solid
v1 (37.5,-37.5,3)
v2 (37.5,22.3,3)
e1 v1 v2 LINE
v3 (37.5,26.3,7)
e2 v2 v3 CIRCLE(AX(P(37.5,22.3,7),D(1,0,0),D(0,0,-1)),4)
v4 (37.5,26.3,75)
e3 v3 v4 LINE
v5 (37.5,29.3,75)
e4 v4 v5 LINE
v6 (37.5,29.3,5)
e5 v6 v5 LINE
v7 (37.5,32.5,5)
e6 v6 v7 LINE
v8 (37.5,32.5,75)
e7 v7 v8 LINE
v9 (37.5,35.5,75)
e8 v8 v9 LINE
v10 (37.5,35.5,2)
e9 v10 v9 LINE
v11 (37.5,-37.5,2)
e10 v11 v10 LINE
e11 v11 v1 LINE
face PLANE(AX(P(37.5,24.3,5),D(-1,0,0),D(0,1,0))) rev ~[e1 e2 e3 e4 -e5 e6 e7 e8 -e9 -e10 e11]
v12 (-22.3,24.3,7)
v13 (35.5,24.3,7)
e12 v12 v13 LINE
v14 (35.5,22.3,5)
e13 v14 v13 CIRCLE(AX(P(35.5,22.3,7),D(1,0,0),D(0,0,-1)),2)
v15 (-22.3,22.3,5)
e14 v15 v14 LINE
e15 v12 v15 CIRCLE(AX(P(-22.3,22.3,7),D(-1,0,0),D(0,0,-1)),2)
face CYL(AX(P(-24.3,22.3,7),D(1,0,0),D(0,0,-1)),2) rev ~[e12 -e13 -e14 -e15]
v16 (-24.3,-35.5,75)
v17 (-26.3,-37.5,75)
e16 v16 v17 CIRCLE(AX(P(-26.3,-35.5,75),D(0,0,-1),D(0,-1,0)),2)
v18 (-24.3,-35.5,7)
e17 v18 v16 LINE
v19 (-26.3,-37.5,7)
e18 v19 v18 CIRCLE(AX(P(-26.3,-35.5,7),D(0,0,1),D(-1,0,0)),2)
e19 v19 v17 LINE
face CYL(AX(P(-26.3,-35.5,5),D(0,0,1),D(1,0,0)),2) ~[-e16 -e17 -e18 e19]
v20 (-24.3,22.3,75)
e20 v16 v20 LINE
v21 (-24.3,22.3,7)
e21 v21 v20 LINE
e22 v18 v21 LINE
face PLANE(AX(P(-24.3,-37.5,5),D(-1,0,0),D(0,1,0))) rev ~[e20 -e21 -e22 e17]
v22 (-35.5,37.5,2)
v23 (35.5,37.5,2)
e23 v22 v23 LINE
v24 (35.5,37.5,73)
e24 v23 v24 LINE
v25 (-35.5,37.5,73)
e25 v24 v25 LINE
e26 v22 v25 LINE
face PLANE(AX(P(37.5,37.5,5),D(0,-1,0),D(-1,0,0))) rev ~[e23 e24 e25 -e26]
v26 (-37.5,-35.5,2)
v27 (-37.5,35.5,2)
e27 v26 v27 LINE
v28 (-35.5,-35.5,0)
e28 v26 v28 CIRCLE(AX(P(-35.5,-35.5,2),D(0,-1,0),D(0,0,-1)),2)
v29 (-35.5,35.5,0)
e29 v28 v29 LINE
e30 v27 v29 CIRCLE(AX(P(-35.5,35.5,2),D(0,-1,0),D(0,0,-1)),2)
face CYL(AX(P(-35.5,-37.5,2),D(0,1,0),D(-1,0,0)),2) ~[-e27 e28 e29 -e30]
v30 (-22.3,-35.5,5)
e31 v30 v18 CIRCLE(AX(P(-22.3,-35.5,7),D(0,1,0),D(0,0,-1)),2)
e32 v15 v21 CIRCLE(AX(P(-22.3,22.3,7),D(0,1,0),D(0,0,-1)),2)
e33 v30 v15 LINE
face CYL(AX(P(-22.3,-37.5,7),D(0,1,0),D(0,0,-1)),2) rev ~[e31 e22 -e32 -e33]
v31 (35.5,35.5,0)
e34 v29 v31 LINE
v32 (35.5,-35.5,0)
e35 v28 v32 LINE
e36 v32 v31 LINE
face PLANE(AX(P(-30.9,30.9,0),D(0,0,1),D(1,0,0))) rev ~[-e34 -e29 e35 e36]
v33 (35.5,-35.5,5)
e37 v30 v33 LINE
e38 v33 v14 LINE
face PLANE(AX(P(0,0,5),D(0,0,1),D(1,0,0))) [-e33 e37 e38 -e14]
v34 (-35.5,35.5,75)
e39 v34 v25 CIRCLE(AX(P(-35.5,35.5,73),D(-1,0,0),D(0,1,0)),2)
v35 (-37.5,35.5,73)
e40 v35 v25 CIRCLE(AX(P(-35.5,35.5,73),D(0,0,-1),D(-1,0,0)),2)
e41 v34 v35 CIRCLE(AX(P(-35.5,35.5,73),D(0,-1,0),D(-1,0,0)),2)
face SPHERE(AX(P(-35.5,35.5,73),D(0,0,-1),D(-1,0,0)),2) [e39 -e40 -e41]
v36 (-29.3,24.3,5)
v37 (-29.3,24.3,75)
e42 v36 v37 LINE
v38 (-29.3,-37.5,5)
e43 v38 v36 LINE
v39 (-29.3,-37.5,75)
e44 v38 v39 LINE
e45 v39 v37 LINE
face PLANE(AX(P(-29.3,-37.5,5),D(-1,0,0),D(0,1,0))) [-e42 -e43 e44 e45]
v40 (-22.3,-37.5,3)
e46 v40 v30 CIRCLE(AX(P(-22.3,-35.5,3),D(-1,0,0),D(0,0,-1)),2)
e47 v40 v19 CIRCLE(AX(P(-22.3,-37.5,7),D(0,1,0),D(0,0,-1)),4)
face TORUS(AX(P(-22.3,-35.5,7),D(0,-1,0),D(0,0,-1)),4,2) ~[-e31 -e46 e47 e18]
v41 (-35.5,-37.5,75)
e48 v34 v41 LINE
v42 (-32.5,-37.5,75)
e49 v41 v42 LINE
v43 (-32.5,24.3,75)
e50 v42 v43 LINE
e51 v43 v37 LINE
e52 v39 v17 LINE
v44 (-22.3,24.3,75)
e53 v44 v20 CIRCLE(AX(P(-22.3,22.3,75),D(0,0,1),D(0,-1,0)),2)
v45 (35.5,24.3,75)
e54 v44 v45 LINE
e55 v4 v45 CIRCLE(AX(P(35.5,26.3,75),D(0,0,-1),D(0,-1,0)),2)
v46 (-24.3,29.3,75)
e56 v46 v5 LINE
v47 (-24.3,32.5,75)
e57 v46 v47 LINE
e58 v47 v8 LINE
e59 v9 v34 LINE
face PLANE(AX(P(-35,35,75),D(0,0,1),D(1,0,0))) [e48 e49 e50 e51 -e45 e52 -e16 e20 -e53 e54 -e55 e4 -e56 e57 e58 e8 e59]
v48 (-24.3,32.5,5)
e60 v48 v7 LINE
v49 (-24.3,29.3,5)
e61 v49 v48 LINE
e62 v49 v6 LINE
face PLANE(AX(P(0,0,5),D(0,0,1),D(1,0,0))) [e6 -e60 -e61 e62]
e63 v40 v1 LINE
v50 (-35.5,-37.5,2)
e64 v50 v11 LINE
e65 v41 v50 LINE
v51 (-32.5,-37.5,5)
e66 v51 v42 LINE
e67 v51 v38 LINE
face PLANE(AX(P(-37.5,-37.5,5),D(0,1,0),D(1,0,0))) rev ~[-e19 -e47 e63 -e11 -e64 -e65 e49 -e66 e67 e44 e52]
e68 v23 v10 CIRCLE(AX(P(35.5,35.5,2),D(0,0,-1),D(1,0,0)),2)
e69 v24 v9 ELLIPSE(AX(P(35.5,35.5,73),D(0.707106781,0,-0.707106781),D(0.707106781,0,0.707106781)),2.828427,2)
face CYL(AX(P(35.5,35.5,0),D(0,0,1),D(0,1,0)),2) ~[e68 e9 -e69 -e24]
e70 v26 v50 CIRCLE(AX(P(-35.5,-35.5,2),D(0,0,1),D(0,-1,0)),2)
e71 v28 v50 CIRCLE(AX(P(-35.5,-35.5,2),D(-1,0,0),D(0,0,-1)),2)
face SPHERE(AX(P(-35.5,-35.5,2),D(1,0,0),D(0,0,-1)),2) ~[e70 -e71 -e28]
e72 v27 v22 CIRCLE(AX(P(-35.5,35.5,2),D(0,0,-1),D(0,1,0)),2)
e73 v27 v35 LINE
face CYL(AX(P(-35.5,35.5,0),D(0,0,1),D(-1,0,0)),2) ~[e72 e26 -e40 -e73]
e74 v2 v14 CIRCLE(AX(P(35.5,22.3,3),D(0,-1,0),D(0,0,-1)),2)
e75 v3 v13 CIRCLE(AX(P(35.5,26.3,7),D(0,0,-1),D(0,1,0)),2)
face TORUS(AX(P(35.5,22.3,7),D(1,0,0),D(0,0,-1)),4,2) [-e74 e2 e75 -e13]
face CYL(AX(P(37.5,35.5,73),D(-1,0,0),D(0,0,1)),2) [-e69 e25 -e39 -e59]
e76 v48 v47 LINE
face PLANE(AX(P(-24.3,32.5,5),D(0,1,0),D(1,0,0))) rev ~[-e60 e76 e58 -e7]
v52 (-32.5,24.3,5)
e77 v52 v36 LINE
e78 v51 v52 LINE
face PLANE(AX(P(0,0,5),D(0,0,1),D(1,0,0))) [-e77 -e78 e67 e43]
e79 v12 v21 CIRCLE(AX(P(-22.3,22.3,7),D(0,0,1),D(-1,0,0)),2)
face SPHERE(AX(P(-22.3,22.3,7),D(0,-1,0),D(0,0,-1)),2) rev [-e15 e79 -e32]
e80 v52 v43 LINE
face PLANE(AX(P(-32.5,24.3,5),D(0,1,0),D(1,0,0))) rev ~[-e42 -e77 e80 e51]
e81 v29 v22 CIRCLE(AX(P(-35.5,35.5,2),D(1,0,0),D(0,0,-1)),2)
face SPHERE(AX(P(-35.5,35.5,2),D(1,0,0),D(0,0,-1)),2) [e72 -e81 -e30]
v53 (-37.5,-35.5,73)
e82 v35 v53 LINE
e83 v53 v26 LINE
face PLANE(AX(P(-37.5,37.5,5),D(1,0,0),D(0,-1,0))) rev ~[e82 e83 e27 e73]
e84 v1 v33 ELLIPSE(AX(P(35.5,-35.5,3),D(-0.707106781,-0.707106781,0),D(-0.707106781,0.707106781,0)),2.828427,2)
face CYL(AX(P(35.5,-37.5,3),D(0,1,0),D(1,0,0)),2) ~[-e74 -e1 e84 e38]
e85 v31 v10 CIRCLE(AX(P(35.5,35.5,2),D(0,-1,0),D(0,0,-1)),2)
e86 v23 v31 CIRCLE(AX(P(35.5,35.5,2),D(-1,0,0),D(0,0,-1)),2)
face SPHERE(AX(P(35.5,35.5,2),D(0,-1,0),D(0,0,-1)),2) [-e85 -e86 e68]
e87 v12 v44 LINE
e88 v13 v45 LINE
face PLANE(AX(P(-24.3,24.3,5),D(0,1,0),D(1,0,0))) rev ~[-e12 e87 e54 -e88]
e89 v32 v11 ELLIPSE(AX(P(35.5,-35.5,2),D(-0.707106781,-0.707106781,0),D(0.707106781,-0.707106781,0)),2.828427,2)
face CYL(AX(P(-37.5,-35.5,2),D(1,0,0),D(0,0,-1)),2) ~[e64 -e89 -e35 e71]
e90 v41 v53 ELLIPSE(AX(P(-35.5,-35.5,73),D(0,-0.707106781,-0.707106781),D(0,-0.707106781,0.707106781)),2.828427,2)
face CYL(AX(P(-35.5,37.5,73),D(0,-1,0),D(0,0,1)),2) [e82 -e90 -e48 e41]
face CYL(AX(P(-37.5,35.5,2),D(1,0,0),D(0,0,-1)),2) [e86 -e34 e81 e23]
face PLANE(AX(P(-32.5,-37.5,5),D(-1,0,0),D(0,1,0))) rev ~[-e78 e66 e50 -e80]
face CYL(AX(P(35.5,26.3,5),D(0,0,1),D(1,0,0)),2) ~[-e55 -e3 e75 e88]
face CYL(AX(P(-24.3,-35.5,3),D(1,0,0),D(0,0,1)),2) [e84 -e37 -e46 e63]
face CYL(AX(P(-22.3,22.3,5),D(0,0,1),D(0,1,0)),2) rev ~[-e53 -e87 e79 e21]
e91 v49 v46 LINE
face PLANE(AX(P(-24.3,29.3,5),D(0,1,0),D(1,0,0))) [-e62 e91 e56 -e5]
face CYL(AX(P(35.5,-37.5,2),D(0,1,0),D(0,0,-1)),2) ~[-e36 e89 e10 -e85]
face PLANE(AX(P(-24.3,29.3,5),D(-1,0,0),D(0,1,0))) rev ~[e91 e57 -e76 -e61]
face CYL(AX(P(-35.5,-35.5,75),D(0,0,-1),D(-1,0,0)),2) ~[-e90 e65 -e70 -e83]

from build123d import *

# Parameters (mm, degrees)
F0_W     = 75
F0_H     = 75
F1_DEPTH = 5
F2_W     = 5
F2_H     = 5
F2_W_2   = 3.2
F2_H_2   = 3.2
F2_W_3   = 61.8
F2_H_3   = 61.8
F3_DEPTH = 70
F4_R     = 2
F5_W     = 3.2
F5_H     = 3.2
F6_DEPTH = 75


# Not quite as in the source:
# - a feature names something its author has since deleted; it is built from what else it names


with BuildPart() as f1:
    # F0 (on Top) → F1 (new body)
    with BuildSketch(Plane.XY):
        Rectangle(F0_W, F0_H)
    extrude(amount=F1_DEPTH)

    # F2 (on face) → F3 (join)
    with BuildSketch(Plane.XY.offset(5)):
        with Locations((-35, 35)):
            Rectangle(F2_W, F2_H)
        with Locations((-30.9, 35)):
            Rectangle(F2_W_2, F2_H)
        with Locations((-35, 30.9)):
            Rectangle(F2_W, F2_H_2)
        with Locations((-26.8, 35)):
            Rectangle(F2_W, F2_H)
        with Locations((-35, 26.8)):
            Rectangle(F2_W, F2_H)
        with Locations((-30.9, 26.8)):
            Rectangle(F2_W_2, F2_H)
        with Locations((-26.8, 30.9)):
            Rectangle(F2_W, F2_H_2)
        with Locations((6.6, 35)):
            Rectangle(F2_W_3, F2_H)
        with Locations((-35, -6.6)):
            Rectangle(F2_W, F2_H_3)
        with Locations((-26.8, 26.8)):
            Rectangle(F2_W, F2_H)
        with Locations((-26.8, -6.6)):
            Rectangle(F2_W, F2_H_3)
        with Locations((6.6, 26.8)):
            Rectangle(F2_W_3, F2_H)
    extrude(amount=F3_DEPTH)

    # F4
    f4_edges = [f1.edges().sort_by_distance(p)[0] for p in [
        (0, -37.5, 0),
        (37.5, 0, 0),
        (0, 37.5, 0),
        (-37.5, 0, 0),
        (-37.5, 37.5, 37.5),
        (-37.5, 0, 75),
        (-37.5, -37.5, 37.5),
        (37.5, 37.5, 37.5),
        (0, 37.5, 75),
        (-24.3, -6.6, 5),
        (6.6, 24.3, 5),
        (37.5, -6.6, 5),
        (6.6, -37.5, 5),
        (-24.3, 24.3, 40),
        (-24.3, -37.5, 40),
        (37.5, 24.3, 40),
    ]]
    fillet(f4_edges, radius=F4_R)

    # F5 (on face) → F6 (join, through all)
    with BuildSketch(Plane.XY.offset(75)):
        with Locations((-30.9, 30.9)):
            Rectangle(F5_W, F5_H)
    extrude(amount=-F6_DEPTH)


solid = f1.part
